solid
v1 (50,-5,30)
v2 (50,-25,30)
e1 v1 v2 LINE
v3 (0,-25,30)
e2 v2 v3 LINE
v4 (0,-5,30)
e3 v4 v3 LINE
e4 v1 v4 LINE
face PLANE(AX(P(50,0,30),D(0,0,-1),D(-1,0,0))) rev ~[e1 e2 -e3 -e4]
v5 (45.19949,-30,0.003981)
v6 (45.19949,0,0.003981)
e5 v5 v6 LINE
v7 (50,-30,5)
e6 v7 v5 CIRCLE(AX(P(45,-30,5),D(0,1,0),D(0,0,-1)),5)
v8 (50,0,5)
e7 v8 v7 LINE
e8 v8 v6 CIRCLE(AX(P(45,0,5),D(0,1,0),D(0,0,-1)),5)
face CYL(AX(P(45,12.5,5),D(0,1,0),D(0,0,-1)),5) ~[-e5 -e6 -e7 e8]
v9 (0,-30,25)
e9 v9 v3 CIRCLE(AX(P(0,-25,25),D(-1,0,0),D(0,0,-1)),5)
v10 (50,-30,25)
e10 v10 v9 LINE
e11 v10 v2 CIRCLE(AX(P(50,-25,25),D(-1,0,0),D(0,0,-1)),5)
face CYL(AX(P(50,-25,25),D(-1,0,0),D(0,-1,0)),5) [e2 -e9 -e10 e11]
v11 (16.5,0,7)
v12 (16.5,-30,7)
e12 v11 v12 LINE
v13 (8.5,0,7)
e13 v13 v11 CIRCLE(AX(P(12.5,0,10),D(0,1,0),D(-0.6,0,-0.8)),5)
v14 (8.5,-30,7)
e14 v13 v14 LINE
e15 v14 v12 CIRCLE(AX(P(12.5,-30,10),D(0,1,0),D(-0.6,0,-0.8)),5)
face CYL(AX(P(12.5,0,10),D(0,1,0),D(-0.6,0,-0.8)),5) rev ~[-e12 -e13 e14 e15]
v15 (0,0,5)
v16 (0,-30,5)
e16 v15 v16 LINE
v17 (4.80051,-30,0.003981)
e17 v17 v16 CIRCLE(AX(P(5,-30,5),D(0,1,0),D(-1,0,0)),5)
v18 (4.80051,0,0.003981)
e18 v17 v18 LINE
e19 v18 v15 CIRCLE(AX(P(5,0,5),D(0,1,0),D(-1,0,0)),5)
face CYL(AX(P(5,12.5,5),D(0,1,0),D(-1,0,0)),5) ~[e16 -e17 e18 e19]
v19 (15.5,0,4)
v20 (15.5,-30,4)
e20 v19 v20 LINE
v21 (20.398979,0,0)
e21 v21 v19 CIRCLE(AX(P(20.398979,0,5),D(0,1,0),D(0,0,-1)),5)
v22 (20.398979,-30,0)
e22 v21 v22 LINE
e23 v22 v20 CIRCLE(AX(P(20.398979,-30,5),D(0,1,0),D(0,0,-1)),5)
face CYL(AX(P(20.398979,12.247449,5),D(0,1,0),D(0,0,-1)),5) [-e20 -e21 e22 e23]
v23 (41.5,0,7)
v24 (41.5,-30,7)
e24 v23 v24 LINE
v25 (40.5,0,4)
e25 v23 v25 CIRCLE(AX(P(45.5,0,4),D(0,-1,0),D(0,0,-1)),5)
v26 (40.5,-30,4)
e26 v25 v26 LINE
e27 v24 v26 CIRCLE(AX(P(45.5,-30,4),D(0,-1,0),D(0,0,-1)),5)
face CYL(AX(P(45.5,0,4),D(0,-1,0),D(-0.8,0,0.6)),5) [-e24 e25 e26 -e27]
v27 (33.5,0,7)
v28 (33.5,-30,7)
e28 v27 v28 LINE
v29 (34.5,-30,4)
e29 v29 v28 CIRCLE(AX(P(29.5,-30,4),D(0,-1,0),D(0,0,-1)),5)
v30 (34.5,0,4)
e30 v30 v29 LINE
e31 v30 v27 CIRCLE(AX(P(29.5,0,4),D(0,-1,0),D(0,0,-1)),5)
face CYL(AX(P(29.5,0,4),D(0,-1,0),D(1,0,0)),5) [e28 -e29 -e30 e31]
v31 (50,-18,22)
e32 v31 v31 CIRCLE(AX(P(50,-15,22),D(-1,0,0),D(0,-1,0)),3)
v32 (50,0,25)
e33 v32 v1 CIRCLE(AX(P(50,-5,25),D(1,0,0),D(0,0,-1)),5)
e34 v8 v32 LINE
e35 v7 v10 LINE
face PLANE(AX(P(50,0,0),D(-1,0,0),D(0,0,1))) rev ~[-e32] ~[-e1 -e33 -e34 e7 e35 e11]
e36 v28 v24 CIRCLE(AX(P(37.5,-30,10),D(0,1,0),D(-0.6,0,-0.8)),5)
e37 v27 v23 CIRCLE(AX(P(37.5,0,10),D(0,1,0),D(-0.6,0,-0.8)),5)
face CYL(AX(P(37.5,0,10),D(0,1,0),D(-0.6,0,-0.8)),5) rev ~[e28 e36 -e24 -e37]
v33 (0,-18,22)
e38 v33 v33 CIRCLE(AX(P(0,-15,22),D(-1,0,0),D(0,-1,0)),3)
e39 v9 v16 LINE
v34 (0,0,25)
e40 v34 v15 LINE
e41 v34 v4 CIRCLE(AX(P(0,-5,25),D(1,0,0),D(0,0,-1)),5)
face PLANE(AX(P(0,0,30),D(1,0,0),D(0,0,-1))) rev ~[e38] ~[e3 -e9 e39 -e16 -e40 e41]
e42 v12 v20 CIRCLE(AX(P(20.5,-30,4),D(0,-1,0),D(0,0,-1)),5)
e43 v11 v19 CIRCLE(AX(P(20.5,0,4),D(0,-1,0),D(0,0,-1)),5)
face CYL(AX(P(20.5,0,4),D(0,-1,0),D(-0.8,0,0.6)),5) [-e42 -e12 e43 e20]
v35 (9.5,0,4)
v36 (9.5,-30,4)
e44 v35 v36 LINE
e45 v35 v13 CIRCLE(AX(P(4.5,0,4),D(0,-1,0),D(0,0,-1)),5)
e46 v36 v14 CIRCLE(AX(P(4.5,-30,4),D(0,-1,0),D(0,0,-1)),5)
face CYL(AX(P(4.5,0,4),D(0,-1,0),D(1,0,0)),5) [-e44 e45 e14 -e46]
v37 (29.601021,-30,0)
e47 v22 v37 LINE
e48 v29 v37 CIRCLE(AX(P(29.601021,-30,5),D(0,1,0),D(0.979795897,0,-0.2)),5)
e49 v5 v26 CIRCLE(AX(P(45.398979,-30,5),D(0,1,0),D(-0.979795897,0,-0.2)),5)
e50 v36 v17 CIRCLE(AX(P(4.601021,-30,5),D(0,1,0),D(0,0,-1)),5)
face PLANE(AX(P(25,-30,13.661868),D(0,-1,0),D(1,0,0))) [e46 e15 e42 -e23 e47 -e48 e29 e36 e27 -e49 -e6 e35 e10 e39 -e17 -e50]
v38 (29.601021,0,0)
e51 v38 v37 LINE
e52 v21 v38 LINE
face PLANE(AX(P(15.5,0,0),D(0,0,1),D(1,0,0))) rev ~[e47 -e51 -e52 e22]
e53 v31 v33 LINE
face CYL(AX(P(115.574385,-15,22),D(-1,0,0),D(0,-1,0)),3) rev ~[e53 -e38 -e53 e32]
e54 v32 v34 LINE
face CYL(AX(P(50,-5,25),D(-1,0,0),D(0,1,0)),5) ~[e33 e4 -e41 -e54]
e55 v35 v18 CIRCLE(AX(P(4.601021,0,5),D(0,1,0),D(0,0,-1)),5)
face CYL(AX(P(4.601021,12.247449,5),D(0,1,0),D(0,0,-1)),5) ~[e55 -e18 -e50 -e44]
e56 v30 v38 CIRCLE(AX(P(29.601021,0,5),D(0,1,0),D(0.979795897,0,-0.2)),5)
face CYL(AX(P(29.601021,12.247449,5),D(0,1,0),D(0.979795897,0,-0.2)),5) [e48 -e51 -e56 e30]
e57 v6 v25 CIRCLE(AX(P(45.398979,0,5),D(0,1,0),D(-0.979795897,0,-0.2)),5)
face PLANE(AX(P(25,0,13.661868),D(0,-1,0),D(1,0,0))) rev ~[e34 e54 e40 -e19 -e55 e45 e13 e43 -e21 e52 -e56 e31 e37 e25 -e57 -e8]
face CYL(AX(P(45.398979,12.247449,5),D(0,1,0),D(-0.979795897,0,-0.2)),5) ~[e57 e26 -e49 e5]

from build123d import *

# Parameters (mm, degrees)
F1_DEPTH    = 30
F2_R        = 5
F3_T1_DEPTH = 54.4948974279
F3_T3_DEPTH = 55
F4_R        = 5
F6_D        = 6


# Not quite as in the source:
# - a fillet or chamfer that OpenCascade refuses, or shapes differently, is made with other operations: its cross-section is extruded or revolved along the edge and cut away or added


with BuildPart() as f1:
    # F0 (on Front) → F1 (new body)
    with BuildSketch(Plane.XZ):
        with BuildLine():
            Line((0, 30), (0, 0))
            Line((0, 0), (9.5, 0))
            Line((9.5, 0), (9.5, 6))
            ThreePointArc((9.5, 6), (10.2639320225, 14.472135955), (17.5, 10))
            ThreePointArc((17.5, 10), (16.972135955, 7.7639320225), (15.5, 6))
            Line((15.5, 6), (15.5, 0))
            Line((15.5, 0), (34.5, 0))
            Line((34.5, 0), (34.5, 6))
            ThreePointArc((34.5, 6), (35.2639320225, 14.472135955), (42.5, 10))
            ThreePointArc((42.5, 10), (41.972135955, 7.7639320225), (40.5, 6))
            Line((40.5, 6), (40.5, 0))
            Line((40.5, 0), (50, 0))
            Line((50, 0), (50, 30))
            Line((50, 30), (0, 30))
        make_face()
    extrude(amount=F1_DEPTH)

    # F2
    f2_edges = [f1.edges().sort_by_distance(p)[0] for p in [
        (40.5, -15, 6),
        (34.5, -15, 6),
        (9.5, -15, 6),
        (15.5, -15, 6),
    ]]
    fillet(f2_edges, radius=F2_R)

    # F3: fillet of radius 5 on 6 edges, made by hand

    # F3_s2 → F3_t1 (cut)
    with BuildSketch(Plane.XZ.offset(-12.2474487139)):
        with BuildLine():
            ThreePointArc((4.6010205144, 0), (7.7632981746, 1.1270166538), (9.5, 4))
            Line((9.5, 4), (9.5, 0))
            Line((9.5, 0), (4.6010205144, 0))
        make_face()
        with BuildLine():
            ThreePointArc((34.5, 4), (32.7632981746, 1.1270166538), (29.6010205144, 0))
            Line((29.6010205144, 0), (34.5, 0))
            Line((34.5, 0), (34.5, 4))
        make_face()
        with BuildLine():
            ThreePointArc((40.5, 4), (42.2367018254, 1.1270166538), (45.3989794856, 0))
            Line((45.3989794856, 0), (40.5, 0))
            Line((40.5, 0), (40.5, 4))
        make_face()
        with BuildLine():
            ThreePointArc((20.3989794856, 0), (17.2367018254, 1.1270166538), (15.5, 4))
            Line((15.5, 4), (15.5, 0))
            Line((15.5, 0), (20.3989794856, 0))
        make_face()
    extrude(amount=F3_T1_DEPTH, mode=Mode.SUBTRACT)

    # F3_s4 → F3_t3 (cut)
    with BuildSketch(Plane.XZ.offset(-12.5)):
        with BuildLine():
            ThreePointArc((45, 0), (48.5355339059, 1.4644660941), (50, 5))
            Line((50, 5), (50, 0))
            Line((50, 0), (45, 0))
        make_face()
        with BuildLine():
            ThreePointArc((0, 5), (1.4644660941, 1.4644660941), (5, 0))
            Line((5, 0), (0, 0))
            Line((0, 0), (0, 5))
        make_face()
    extrude(amount=F3_T3_DEPTH, mode=Mode.SUBTRACT)

    # F4
    f4_edges = [f1.edges().sort_by_distance(p)[0] for p in [
        (25, -30, 30),
        (25, 0, 30),
    ]]
    fillet(f4_edges, radius=F4_R)

    # F6 (through all)
    with Locations(Plane.YZ.offset(50)):
        with Locations((-15, 22)):
            Hole(F6_D / 2)


solid = f1.part
